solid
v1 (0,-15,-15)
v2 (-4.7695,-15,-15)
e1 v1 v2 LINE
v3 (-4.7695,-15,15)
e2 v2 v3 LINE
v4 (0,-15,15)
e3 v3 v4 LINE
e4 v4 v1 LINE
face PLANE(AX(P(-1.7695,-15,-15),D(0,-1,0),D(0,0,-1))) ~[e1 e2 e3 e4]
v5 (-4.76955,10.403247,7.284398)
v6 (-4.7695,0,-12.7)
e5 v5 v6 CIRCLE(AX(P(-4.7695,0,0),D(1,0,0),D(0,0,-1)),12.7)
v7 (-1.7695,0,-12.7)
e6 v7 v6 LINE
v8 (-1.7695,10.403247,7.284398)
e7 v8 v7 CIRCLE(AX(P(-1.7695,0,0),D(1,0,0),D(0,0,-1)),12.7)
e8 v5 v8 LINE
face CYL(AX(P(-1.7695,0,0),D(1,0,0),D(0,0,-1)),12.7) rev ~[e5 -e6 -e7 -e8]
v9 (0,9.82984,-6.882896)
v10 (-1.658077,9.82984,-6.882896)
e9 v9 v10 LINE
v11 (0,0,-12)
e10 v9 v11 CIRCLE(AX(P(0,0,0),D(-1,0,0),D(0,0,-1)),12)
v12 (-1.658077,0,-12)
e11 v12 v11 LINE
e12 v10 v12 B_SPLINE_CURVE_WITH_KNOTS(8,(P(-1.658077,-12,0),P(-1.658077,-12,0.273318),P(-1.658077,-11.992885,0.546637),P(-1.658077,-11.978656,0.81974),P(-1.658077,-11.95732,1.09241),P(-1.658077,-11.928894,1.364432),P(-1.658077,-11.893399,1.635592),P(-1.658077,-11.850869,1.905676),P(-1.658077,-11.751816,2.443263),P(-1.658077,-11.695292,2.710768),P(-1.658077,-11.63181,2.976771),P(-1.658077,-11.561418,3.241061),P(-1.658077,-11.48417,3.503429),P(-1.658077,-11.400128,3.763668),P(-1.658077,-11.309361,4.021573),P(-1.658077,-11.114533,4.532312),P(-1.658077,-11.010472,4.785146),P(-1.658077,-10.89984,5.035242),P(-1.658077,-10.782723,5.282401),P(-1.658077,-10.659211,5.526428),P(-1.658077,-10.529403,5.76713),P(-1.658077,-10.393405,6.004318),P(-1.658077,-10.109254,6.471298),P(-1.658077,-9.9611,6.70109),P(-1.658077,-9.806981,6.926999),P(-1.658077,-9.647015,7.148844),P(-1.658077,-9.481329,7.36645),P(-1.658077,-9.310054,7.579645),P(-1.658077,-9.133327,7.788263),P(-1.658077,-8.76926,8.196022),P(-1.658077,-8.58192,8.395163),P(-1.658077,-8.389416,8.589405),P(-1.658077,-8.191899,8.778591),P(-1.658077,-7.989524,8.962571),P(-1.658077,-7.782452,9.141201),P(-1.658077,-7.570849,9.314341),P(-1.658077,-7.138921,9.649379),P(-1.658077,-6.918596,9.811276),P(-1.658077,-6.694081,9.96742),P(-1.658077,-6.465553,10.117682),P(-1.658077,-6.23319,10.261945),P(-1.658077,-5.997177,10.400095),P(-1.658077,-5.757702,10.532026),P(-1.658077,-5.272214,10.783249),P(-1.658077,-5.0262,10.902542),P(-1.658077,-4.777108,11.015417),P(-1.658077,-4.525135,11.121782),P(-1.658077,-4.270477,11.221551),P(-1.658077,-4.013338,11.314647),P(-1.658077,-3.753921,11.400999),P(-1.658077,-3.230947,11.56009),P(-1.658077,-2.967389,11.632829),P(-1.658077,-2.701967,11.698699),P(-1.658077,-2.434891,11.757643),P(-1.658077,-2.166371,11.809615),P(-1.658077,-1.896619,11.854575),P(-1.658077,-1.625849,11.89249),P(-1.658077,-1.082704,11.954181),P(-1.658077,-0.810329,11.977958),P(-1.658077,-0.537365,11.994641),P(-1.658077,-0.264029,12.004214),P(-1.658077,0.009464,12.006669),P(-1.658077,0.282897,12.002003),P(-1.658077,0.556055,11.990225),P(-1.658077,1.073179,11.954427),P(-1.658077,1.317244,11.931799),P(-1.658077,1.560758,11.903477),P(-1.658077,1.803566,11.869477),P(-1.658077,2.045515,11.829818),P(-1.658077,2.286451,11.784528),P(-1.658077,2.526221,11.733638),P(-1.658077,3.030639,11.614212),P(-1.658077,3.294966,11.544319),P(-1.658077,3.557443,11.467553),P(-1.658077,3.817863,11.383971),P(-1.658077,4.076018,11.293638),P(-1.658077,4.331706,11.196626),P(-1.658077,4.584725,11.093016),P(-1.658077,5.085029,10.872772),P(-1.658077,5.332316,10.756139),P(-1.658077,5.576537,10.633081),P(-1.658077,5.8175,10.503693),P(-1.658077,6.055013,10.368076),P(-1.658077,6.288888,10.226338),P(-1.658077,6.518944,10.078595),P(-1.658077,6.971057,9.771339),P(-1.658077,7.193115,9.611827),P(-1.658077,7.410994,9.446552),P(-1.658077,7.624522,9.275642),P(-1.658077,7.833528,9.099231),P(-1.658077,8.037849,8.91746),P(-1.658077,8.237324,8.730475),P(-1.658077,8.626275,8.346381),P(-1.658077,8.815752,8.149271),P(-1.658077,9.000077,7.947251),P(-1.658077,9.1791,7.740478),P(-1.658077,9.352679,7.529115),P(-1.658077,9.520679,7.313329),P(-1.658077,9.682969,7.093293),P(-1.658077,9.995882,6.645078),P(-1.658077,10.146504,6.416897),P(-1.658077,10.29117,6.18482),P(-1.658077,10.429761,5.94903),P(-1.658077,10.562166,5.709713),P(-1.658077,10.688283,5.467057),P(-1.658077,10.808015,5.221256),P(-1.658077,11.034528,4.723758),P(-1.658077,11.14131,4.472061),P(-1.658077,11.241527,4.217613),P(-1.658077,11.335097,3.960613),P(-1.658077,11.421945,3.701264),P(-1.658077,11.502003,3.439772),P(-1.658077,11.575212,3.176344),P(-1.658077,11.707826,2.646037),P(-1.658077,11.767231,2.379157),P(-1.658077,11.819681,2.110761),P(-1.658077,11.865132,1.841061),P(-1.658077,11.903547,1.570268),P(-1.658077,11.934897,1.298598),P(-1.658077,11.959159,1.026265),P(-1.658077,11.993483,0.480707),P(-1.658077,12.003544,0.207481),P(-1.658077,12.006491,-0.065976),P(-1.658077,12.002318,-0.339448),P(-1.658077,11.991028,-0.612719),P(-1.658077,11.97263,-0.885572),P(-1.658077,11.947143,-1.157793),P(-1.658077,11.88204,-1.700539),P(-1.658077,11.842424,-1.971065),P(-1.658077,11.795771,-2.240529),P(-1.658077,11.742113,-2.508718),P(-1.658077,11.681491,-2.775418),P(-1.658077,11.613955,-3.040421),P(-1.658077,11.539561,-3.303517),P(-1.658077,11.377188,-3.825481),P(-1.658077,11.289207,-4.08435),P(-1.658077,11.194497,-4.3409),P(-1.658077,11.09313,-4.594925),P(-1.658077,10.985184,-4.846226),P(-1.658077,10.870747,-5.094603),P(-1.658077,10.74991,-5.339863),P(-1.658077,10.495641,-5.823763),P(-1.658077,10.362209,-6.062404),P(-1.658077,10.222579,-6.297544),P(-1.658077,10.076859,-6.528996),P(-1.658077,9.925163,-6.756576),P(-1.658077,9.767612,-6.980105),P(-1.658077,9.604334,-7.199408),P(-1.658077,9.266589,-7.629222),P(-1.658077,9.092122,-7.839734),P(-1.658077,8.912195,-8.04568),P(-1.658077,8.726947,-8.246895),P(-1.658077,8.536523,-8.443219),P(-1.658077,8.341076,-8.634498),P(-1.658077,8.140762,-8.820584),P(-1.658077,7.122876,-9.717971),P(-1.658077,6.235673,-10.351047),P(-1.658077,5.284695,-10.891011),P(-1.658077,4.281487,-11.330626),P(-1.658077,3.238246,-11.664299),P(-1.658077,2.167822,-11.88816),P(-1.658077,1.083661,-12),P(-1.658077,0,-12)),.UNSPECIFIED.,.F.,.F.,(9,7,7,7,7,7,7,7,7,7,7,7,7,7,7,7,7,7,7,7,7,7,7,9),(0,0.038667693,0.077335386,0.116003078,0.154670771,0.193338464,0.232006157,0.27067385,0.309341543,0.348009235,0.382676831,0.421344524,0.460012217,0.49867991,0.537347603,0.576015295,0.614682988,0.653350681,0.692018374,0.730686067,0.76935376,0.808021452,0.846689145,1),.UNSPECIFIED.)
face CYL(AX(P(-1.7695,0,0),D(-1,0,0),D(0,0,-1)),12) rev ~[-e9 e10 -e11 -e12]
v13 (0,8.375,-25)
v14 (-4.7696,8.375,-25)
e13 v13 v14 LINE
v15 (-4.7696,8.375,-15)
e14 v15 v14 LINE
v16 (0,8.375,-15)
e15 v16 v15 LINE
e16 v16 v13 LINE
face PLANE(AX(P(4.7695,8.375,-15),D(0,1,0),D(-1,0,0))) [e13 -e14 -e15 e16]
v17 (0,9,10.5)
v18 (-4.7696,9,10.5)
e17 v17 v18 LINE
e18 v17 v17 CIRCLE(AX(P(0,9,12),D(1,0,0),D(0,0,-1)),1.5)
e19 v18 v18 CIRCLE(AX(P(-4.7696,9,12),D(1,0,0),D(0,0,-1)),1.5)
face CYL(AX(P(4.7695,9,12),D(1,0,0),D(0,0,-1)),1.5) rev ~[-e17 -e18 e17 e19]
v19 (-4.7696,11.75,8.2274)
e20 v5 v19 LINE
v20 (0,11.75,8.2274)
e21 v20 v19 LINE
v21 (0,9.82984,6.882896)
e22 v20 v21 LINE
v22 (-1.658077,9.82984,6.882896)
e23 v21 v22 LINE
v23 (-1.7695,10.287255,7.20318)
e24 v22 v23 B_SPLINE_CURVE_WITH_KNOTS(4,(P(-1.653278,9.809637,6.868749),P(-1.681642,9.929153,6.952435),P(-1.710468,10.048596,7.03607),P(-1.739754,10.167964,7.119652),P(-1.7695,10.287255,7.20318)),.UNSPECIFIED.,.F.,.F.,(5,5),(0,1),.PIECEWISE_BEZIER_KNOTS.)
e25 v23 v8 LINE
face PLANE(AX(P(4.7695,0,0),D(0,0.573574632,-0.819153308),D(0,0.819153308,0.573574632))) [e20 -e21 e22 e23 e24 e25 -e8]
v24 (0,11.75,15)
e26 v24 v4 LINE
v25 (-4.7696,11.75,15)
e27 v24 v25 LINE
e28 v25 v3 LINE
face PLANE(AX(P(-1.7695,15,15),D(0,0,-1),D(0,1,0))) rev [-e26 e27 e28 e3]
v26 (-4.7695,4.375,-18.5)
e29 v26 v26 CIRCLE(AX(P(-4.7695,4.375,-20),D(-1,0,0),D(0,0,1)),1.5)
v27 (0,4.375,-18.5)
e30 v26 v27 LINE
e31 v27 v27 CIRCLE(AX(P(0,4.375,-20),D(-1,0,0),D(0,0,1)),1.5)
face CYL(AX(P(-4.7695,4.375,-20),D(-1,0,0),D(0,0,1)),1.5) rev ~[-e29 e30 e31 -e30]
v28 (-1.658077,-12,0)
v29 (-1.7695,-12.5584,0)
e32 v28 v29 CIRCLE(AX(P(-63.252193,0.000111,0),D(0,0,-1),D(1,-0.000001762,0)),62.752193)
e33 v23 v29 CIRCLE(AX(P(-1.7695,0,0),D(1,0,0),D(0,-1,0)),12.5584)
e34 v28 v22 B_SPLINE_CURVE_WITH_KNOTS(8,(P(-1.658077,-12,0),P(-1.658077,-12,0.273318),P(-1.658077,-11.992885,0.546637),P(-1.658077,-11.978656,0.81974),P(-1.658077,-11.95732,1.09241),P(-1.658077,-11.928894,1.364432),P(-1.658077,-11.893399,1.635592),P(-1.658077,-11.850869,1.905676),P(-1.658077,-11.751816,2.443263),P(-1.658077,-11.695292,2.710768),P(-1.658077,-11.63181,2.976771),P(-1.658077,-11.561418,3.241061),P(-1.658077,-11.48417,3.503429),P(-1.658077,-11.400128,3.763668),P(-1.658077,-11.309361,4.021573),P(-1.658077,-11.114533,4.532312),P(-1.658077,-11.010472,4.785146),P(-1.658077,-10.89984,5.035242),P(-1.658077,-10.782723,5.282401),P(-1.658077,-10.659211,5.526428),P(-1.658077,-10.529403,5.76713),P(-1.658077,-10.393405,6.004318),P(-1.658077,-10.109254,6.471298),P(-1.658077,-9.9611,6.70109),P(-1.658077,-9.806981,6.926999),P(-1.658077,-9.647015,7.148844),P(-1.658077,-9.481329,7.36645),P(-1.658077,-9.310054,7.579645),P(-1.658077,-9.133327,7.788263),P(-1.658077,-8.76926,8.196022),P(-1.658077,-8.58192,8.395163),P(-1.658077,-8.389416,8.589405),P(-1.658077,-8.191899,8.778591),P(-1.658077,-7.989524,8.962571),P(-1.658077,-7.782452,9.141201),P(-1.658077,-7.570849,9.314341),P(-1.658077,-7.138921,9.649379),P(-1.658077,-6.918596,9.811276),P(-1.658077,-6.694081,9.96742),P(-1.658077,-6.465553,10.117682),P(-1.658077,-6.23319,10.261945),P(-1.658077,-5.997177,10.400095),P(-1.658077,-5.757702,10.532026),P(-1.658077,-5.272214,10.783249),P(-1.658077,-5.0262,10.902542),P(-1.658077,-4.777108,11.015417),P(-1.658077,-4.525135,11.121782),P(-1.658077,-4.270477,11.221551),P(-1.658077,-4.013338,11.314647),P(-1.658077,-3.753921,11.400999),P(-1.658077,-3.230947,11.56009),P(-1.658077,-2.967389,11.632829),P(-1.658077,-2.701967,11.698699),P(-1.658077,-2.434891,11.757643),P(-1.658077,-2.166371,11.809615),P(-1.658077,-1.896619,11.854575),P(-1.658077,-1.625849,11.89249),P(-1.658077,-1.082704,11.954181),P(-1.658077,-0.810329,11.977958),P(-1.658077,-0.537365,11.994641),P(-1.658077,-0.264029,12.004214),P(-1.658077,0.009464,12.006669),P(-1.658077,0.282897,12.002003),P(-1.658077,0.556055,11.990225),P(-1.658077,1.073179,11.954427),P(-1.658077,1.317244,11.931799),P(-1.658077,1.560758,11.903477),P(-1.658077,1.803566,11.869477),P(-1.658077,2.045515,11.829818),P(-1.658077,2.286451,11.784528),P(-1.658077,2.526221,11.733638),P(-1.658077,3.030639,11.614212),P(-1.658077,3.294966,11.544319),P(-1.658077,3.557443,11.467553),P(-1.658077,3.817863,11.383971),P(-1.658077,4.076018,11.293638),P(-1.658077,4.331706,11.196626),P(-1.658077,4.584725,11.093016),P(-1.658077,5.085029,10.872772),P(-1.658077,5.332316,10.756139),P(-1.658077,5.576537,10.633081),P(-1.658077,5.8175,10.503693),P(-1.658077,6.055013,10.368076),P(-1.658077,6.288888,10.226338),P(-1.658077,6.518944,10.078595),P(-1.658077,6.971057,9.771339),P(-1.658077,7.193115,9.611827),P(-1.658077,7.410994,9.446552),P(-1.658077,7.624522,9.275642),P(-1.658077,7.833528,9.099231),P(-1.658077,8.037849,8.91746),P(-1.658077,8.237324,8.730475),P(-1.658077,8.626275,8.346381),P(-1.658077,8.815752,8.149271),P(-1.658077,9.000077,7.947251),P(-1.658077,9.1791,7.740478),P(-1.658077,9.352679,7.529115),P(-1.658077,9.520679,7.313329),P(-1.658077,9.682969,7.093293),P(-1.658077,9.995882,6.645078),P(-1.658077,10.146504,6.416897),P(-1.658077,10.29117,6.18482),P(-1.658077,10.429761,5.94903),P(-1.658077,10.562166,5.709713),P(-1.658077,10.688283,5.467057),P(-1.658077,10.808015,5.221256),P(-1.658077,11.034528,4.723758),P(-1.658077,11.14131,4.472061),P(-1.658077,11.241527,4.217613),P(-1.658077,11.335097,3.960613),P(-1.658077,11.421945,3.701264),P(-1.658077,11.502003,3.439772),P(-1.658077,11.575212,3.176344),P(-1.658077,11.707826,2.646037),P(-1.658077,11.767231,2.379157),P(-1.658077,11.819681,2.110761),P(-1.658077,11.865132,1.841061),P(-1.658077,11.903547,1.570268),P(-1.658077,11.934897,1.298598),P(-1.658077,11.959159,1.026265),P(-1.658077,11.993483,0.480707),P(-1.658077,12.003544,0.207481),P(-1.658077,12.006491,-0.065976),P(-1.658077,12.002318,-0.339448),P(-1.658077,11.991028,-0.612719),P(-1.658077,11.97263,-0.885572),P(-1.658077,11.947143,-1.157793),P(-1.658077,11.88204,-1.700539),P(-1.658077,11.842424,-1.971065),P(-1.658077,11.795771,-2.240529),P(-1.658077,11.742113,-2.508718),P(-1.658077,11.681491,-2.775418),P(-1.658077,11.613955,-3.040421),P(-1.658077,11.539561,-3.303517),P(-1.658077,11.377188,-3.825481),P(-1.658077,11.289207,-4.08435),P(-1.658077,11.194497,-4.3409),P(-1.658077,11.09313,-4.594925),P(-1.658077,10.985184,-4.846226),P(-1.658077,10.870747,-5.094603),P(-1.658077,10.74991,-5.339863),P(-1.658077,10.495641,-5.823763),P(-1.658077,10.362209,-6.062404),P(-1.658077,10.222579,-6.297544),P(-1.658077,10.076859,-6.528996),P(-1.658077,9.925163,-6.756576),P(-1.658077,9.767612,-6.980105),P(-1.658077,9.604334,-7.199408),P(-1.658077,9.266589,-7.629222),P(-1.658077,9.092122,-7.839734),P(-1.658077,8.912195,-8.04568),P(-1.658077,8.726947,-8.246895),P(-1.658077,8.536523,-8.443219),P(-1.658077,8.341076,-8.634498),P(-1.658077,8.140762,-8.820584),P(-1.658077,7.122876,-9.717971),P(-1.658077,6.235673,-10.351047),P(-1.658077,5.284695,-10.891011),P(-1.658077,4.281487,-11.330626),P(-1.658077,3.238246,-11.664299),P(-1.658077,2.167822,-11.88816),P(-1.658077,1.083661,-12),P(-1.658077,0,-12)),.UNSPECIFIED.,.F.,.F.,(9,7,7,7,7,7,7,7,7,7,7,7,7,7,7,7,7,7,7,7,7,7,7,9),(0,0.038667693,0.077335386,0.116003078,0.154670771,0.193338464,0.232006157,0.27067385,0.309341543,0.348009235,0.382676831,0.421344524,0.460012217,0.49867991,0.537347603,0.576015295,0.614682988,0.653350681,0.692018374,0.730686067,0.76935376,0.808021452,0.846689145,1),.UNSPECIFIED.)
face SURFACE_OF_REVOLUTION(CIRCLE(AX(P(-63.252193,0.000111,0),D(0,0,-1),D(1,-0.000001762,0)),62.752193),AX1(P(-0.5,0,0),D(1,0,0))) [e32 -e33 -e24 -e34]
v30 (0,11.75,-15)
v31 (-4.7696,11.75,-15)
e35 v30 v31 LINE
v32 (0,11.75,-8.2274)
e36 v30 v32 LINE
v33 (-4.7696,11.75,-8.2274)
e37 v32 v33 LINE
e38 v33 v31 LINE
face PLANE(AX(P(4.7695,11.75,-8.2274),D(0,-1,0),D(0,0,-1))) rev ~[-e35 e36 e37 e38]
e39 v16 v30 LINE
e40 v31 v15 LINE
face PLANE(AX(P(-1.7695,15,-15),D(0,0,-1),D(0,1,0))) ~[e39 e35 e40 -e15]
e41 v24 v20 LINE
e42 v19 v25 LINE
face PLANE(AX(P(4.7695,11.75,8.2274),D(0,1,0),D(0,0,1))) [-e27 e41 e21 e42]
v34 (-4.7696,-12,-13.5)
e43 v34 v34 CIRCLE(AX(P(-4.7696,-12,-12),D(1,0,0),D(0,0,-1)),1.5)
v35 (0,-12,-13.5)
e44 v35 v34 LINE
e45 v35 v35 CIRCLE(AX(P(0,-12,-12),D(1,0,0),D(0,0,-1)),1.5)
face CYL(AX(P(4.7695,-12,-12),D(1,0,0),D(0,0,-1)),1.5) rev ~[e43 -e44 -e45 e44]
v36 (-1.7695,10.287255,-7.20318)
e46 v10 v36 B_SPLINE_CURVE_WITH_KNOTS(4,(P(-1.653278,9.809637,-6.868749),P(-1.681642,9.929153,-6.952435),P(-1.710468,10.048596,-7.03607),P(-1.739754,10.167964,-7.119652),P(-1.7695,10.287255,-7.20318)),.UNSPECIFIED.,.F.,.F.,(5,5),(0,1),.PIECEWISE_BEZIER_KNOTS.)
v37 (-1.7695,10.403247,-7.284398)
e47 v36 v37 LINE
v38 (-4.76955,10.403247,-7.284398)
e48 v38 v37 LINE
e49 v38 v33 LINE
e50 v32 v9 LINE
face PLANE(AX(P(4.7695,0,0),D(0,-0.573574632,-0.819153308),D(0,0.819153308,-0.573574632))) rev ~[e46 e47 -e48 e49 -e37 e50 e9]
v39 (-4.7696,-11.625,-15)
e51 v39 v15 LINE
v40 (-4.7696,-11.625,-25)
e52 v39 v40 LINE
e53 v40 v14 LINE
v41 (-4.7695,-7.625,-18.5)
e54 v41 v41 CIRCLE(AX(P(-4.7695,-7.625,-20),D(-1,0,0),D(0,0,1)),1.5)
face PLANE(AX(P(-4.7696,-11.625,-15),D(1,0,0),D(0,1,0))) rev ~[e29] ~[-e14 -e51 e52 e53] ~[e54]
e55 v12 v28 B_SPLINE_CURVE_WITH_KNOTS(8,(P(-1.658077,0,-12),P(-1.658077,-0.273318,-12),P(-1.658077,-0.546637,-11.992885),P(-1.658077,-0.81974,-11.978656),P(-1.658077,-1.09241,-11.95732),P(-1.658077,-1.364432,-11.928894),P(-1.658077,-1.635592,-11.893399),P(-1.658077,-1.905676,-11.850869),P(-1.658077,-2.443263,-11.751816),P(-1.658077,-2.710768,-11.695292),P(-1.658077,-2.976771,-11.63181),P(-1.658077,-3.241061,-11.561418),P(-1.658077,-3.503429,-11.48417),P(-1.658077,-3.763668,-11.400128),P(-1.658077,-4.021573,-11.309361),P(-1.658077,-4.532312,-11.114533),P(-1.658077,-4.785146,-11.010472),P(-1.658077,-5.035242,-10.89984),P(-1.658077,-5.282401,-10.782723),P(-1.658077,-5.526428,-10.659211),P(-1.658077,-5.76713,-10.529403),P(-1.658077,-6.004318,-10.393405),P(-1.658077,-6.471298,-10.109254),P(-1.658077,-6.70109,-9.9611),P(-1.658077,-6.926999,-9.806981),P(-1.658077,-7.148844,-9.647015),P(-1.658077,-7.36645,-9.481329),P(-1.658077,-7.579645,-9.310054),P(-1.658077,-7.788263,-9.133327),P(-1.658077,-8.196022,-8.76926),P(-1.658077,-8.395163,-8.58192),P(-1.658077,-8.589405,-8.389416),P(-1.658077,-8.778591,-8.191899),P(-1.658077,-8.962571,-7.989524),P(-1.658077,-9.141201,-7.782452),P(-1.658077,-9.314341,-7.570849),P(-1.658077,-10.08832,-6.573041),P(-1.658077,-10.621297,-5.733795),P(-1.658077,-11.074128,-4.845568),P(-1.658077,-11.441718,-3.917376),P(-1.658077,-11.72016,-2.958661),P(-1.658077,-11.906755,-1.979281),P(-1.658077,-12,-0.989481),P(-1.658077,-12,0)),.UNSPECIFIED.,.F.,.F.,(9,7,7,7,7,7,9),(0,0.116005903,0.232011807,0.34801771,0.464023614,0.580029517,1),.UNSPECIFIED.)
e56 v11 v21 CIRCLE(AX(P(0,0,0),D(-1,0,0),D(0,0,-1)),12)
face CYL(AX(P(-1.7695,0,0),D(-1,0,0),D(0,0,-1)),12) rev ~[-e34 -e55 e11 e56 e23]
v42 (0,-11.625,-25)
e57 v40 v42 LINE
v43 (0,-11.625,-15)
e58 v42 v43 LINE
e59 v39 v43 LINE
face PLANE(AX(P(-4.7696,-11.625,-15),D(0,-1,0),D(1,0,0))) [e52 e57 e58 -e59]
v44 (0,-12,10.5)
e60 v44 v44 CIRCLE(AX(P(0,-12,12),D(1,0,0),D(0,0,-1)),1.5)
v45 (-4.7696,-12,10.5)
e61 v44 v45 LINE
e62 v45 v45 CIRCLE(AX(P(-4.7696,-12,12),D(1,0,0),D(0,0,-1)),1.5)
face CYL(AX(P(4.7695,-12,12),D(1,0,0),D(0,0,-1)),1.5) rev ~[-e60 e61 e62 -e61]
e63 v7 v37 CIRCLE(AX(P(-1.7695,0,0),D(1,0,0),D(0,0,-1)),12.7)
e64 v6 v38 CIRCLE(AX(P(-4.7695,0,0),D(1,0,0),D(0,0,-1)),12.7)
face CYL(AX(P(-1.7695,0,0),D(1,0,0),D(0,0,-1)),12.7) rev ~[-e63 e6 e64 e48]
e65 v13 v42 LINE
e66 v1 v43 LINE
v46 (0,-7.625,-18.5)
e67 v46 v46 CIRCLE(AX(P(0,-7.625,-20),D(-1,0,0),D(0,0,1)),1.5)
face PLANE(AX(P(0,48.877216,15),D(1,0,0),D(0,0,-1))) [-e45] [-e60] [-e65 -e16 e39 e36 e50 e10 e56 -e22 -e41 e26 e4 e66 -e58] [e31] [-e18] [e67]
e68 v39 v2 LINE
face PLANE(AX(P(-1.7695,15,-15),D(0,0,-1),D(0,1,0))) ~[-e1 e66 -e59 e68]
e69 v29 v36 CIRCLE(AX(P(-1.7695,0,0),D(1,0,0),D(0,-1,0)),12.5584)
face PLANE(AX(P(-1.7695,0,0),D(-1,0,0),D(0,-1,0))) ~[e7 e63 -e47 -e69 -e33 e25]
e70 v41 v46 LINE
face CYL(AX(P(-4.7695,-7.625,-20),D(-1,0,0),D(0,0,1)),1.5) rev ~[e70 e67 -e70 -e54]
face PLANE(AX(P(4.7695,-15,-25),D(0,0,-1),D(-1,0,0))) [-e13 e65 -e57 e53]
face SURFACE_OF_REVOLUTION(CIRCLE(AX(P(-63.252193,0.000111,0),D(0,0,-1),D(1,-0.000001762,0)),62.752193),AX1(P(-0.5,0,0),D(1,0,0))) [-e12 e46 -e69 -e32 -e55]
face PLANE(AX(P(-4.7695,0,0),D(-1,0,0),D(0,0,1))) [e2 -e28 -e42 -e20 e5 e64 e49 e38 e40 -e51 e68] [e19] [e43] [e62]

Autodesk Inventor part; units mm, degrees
ref_plane "YZ Plane" through (0, 0, 0) normal (1, 0, 0) x (0, 1, 0)
ref_plane "XZ Plane" through (0, 0, 0) normal (0, 1, 0) x (-1, 0, 0)
sketch "Sketch1" plane through (0, 0, 0) normal (1, 0, 0) x (0, 1, 0)
  line L0 (-15, 15) -> (15, 15)
  line L1 (15, 15) -> (15, -15)
  line L2 (15, -15) -> (-15, -15)
  line L3 (-15, -15) -> (-15, 15)
  line L4 (-15, 15) -> (15, -15) construction
  line L5 (15, 15) -> (-15, -15) construction
  point P0 (0, 0)
  dimension "d0" = 30
  dimension "d1" = 30
extrude "Extrusion1" add sketch "Sketch1" along normal blind 1.7695
sketch "Sketch2" plane through (1.7695, 0, 0) normal (1, 0, 0) x (0, 0, -1)
  circle A0 centre (0, 0) radius 12
  dimension "d4" = 24
extrude "Extrusion2" cut sketch "Sketch2" against normal up to next
sketch "Sketch3" plane through (0, 0, 0) normal (0, 0, 1) x (1, 0, 0)
  line L0 (1.7695, 15) -> (1.7695, -15) projected
  line L1 (1.7695, 0) -> (1.7695, -12.5584)
  line L2 (0.5, 0) -> (1.7695, 0)
  arc A0 (0.5, 0) -> (1.7695, -12.5584) centre (63.25, 0) ccw
  point P0 (0, 0)
  dimension "d7" = 12.5584
  dimension "d8" = 125.5
revolve "Revolution1" cut sketch "Sketch3" angle 360 about axis through (0.5, 0, 0) along (1, 0, 0)
sketch "Sketch4" plane through (1.7695, 0, 0) normal (1, 0, 0) x (0, 0, -1)
  circle A0 centre (0, 0) radius 12.7
  line L0 (-15, 15) -> (-15, -15) projected
  line L1 (-15, 15) -> (15, 15)
  line L2 (15, 15) -> (15, -15)
  line L3 (15, -15) -> (-15, -15)
  line L4 (-15, -15) -> (-15, 15)
  dimension "d10" = 25.4
extrude "Extrusion3" add sketch "Sketch4" along normal blind 3
ref_plane "Work Plane1" through (0, 0, 0) normal (-1, 0, 0) x (0, 0, 1)
mirror "Mirror1" about plane through (0, 0, 0) normal (-1, 0, 0) of "Extrusion1", "Extrusion2", "Revolution1", "Extrusion3"
sketch "Sketch8" plane through (4.7695, 0, 0) normal (1, 0, 0) x (0, 0, -1)
  circle A0 centre (12, -12) radius 1.5
  line L0 (-15, -15) -> (15, -15) projected
  line L1 (15, -15) -> (15, 15) projected
  circle A1 centre (-12, -12) radius 1.5
  circle A2 centre (-12, 9) radius 1.5
  line L2 (-15, 15) -> (-15, -15) projected
  line L3 (15, 15) -> (-15, 15) projected
  point P0 (0, 0)
  dimension "d30" = 3
  dimension "d31" = 3
  dimension "d32" = 3
  dimension "d33" = 3
  dimension "d34" = 3
  dimension "d35" = 3
  dimension "d36" = 6
extrude "Extrusion7" cut sketch "Sketch8" against normal up to surface (9.5391 mm away) contours A0 | A1 | A2
sketch "Sketch9" plane through (4.7695, 0, 0) normal (1, 0, 0) x (0, 0, -1)
  line L0 (0, 0) -> (-8.2274, 11.75)
  line L1 (-8.2274, 11.75) -> (-15, 11.75)
  line L2 (-15, 15) -> (-15, -15) projected
  line L3 (0, 0) -> (0, 15) construction
  line L4 (-15, 11.75) -> (-15, 15)
  line L5 (15, 15) -> (-15, 15) projected
  line L6 (0, 15) -> (-15, 15)
  line L7 (0, 0) -> (8.2274, 11.75)
  line L8 (8.2274, 11.75) -> (15, 11.75)
  line L9 (15, 15) -> (15, -15)
  line L10 (-15, 15) -> (15, 15)
  dimension "d39" = 35
  dimension "d42" = 3.25
extrude "Extrusion8" cut sketch "Sketch9" against normal up to surface (9.5391 mm away)
sketch "Sketch11" plane through (4.7695, -15, -15) normal (0, 0, -1) x (-1, 0, 0)
  line L0 (9.5391, 0) -> (9.5391, 26.75) projected
  line L1 (0, 0) -> (9.5391, 26.75) construction
  line L2 (0, 26.75) -> (9.5391, 26.75) projected
  line L3 (0, 26.75) -> (9.5391, 0) construction
  line L4 (0, 0) -> (0, 26.75) projected
  line L5 (9.5391, 3.375) -> (0, 3.375)
  line L6 (0, 3.375) -> (0, 23.375)
  line L7 (0, 23.375) -> (9.5391, 23.375)
  line L8 (9.5391, 23.375) -> (9.5391, 3.375)
  line L9 (9.5391, 3.375) -> (0, 23.375) construction
  line L10 (0, 3.375) -> (9.5391, 23.375) construction
  point P0 (4.7695, 15)
  point P1 (4.7695, 13.375)
  dimension "d46" = 20
extrude "Extrusion10" add sketch "Sketch11" along normal blind 10 contours L5 L4 L7 L0
sketch "Sketch12" plane through (-4.7695, -15, -15) normal (-1, 0, 0) x (0, 0, 1)
  circle A0 centre (-5, 19.375) radius 1.5
  circle A1 centre (-5, 7.375) radius 1.5
  line L0 (0, 3.375) -> (-10, 3.375) projected
  line L1 (0, 23.375) -> (-10, 23.375) projected
  point P0 (15, 15)
  dimension "d49" = 4
  dimension "d50" = 5
  dimension "d51" = 4
  dimension "d52" = 5
  dimension "d53" = 3
extrude "Extrusion11" cut sketch "Sketch12" against normal up to surface (9.5391 mm away)
sketch "Sketch13" plane through (4.7695, -15, -15) normal (0, -1, 0) x (1, 0, 0)
  line L0 (-9.5391, 30) -> (0, 30) projected
  line L1 (-4.7695, 30) -> (-4.7695, -10)
  line L2 (0, -10) -> (-9.5391, -10) projected
  point P0 (-4.7695, 15)
split body "Split2" sketch "Sketch13" result one side removed curves L1 removed pieces at (0.5, -13.971, -0.4809)
equation "\"d37\" = d32"
properties part number "LargeLensHolderP1S2" material "Acetal Resin, Black"
